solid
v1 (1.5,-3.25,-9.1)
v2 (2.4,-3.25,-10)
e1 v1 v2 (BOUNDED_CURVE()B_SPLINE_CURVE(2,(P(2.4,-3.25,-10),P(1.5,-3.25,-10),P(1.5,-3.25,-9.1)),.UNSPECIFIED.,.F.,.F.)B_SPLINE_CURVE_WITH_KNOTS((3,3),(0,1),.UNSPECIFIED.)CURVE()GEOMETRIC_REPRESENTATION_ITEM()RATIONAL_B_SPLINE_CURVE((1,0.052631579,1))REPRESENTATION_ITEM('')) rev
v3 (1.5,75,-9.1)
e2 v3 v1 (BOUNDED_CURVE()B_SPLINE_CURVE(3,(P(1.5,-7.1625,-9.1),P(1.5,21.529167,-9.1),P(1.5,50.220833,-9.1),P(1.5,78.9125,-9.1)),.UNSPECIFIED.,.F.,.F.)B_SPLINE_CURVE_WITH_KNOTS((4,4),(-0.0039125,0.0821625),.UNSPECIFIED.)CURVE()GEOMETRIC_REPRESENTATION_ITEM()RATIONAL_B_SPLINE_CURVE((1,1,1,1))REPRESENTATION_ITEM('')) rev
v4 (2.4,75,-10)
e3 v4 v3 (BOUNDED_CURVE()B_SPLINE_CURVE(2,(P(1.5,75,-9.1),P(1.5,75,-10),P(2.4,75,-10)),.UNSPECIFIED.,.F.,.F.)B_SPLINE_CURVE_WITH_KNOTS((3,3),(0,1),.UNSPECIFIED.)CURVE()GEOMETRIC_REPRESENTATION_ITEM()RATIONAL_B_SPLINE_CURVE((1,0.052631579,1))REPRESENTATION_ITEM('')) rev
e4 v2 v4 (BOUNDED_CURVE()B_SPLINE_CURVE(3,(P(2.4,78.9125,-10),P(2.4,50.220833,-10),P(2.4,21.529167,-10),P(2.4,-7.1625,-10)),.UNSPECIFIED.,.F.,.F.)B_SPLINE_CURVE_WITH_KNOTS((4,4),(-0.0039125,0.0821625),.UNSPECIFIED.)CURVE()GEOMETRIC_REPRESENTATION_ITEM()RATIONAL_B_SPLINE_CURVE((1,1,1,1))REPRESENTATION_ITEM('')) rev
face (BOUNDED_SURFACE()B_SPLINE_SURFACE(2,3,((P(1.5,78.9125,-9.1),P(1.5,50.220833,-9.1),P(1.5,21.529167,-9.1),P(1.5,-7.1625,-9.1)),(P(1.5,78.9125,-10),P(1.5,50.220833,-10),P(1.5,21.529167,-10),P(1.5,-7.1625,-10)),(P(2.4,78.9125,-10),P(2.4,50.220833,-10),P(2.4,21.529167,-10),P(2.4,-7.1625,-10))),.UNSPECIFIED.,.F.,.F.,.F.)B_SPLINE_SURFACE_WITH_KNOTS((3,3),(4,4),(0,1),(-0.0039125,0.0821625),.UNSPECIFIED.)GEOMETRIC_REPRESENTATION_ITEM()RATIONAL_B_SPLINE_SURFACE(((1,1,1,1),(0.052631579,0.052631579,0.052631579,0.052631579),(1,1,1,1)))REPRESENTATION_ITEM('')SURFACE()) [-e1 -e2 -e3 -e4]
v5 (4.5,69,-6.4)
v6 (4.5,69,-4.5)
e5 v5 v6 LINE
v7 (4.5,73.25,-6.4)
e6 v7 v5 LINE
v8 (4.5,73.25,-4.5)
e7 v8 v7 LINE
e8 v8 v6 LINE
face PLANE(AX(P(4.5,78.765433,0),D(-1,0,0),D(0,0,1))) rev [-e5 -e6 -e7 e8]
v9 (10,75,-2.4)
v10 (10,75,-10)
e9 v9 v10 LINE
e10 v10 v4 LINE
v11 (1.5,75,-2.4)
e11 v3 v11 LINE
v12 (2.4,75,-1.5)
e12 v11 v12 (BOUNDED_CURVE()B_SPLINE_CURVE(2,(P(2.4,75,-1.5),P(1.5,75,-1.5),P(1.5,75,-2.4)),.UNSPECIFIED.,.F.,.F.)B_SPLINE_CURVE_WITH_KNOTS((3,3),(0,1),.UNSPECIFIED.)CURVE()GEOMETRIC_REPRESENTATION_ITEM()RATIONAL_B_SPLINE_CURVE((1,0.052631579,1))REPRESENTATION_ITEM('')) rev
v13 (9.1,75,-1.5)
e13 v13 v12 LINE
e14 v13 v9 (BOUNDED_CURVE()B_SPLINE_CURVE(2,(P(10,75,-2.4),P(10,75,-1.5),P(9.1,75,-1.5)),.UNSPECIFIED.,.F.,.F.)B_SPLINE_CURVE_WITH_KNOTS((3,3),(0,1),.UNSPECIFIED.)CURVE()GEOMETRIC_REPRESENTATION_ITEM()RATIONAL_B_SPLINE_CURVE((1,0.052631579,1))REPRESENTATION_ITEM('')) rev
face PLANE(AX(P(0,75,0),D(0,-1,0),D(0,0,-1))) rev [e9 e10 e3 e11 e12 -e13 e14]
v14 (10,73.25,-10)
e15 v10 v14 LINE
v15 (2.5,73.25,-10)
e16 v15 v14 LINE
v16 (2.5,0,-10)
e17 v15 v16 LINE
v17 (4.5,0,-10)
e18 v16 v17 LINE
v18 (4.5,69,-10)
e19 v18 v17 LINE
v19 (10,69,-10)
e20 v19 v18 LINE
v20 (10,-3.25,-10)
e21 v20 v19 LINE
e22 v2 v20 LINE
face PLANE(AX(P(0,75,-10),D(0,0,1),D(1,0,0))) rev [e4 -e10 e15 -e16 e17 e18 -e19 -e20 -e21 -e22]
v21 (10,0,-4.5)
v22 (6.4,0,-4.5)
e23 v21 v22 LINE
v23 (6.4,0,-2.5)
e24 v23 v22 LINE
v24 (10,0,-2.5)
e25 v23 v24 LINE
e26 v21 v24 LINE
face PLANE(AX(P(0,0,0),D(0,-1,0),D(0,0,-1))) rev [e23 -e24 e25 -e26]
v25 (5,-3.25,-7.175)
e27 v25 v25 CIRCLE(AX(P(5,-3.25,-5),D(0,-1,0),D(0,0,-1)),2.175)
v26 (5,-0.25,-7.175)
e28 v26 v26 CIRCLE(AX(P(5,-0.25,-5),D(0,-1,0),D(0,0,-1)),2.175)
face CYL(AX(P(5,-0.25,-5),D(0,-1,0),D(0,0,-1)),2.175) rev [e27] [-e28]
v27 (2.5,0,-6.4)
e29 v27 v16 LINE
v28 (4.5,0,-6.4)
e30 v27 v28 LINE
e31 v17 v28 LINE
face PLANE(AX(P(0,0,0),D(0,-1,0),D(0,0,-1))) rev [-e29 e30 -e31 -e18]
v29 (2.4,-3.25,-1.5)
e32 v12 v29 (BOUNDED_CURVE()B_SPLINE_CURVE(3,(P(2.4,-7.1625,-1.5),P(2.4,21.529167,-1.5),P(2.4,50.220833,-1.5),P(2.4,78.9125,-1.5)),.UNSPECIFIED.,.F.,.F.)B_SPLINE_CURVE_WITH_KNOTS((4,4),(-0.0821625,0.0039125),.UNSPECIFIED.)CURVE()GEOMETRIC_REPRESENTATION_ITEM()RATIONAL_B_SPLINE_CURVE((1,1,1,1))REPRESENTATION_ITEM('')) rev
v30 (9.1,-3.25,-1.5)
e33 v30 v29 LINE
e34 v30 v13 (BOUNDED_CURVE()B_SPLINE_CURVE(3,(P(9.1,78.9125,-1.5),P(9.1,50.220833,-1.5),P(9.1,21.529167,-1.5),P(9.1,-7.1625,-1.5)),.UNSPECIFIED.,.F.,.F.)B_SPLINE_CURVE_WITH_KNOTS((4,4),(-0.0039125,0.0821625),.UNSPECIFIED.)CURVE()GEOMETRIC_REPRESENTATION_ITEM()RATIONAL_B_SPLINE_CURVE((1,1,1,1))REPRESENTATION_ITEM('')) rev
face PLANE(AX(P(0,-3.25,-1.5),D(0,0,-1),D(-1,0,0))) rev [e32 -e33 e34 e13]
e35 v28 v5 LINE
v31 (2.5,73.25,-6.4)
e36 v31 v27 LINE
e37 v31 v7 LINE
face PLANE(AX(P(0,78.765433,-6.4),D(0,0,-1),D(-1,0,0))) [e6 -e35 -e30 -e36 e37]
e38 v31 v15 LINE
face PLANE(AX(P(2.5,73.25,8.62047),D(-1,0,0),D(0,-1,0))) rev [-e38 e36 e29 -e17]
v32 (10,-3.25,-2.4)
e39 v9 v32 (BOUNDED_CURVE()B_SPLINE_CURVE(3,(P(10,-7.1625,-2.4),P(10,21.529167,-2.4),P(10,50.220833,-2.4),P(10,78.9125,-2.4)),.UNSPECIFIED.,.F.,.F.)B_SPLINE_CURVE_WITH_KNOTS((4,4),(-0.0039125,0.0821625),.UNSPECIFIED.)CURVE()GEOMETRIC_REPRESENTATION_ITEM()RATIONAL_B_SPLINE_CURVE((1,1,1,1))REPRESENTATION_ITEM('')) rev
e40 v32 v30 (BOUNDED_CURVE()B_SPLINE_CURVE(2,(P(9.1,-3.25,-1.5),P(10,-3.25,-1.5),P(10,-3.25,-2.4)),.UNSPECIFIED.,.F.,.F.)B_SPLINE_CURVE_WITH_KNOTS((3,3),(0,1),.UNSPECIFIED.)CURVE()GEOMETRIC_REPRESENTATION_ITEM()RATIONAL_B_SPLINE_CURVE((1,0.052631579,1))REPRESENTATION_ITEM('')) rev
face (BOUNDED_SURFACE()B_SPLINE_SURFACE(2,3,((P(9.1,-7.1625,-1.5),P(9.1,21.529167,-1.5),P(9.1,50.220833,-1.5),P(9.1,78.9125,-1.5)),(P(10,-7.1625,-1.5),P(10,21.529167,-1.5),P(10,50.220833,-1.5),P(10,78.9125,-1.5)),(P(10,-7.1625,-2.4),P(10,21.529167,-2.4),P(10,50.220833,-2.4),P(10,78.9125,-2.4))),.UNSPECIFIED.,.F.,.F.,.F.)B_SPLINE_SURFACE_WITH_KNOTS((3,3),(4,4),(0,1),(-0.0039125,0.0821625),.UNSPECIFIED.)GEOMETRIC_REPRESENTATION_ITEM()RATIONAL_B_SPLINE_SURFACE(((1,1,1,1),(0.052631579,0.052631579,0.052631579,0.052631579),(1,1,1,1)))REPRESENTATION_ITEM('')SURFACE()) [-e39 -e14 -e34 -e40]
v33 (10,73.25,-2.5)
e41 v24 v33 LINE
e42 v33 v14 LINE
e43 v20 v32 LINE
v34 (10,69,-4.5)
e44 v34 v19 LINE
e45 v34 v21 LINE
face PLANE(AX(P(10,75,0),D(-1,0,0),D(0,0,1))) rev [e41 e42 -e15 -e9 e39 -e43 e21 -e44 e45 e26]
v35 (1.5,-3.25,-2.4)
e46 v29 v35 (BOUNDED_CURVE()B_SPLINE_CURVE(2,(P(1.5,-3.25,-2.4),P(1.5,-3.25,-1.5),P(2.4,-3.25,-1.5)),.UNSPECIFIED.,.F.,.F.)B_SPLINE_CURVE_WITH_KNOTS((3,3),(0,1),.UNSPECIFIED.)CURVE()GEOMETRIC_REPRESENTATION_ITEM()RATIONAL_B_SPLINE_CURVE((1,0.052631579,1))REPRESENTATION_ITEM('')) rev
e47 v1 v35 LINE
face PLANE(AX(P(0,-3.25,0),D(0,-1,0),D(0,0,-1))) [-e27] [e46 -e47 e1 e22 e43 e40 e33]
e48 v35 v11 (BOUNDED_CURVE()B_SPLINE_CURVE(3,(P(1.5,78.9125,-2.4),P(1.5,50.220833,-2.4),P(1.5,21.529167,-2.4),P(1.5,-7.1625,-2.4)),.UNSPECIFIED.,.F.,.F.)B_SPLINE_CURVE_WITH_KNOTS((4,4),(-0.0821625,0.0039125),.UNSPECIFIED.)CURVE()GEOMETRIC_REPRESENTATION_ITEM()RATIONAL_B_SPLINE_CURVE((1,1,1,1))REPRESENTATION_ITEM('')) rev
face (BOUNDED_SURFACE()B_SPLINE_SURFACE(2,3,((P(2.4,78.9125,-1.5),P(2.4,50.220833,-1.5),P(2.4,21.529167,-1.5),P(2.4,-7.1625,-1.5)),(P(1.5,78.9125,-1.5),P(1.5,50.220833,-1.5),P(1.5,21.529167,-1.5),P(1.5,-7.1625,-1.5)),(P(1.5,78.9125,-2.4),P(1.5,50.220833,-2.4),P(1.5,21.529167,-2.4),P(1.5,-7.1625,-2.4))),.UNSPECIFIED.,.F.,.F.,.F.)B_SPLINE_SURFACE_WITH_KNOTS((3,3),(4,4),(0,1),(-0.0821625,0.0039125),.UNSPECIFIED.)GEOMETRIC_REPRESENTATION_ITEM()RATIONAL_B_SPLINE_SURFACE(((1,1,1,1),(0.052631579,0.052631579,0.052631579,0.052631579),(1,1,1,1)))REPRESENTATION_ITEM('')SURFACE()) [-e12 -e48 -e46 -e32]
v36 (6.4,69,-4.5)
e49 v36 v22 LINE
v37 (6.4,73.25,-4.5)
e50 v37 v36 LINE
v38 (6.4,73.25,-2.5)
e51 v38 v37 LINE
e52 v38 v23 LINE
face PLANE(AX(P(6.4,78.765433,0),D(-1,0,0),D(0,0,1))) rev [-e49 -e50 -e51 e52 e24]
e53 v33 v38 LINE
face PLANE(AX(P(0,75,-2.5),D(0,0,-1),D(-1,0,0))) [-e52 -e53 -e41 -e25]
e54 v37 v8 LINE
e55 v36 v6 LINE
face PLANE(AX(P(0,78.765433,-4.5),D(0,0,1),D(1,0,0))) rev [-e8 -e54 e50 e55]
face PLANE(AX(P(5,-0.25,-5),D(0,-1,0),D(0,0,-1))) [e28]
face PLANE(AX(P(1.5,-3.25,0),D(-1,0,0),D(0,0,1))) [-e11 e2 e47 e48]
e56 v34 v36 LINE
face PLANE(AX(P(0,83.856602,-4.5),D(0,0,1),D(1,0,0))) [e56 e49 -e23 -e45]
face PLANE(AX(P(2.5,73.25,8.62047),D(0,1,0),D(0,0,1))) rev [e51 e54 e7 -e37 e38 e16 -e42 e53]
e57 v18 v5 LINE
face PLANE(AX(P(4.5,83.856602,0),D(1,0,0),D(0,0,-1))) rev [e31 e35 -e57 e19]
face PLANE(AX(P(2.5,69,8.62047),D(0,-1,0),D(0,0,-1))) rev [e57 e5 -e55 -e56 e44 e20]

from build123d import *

# Parameters (mm, degrees)
SKETCH1_W           = 10
SKETCH1_H           = 10
BOSS_EXTRUDE1_DEPTH = 75
SKETCH3_W           = 7.5
SKETCH3_H           = 4.25
CUT_EXTRUDE1_DEPTH  = 7.5
SKETCH4_W           = 2
SKETCH4_H           = 5.5
CUT_EXTRUDE2_DEPTH  = 73.25
SKETCH5_W           = 10
SKETCH5_H           = 10
BOSS_EXTRUDE2_DEPTH = 3.25
BOSS_EXTRUDE3_REACH = 78.322
SKETCH6_W           = 1
SKETCH6_H           = 1.9
SKETCH6_H_2         = 2
SKETCH7_R           = 2.175
CUT_EXTRUDE3_DEPTH  = 3
SKETCH8_W           = 8.5
SKETCH8_H           = 1.5
CUT_EXTRUDE4_DEPTH  = 80.517686712
FILLET1_SIZE        = 0.9


with BuildPart() as part:
    # Sketch1 → Boss-Extrude1 (new body)
    with BuildSketch(Plane(origin=(0, 0, 0), x_dir=(1, 0, 0), z_dir=(0, 1, 0))):
        with Locations((5, 5)):
            Rectangle(SKETCH1_W, SKETCH1_H)
    extrude(amount=BOSS_EXTRUDE1_DEPTH)

    # Sketch3 → Cut-Extrude1 (cut)
    with BuildSketch(Plane(origin=(0, 0, -10), x_dir=(-1, 0, 0), z_dir=(0, 0, -1))):
        with Locations((-6.25, 71.125)):
            Rectangle(SKETCH3_W, SKETCH3_H)
    extrude(amount=-CUT_EXTRUDE1_DEPTH, mode=Mode.SUBTRACT)

    # Sketch4 → Cut-Extrude2 (cut)
    with BuildSketch(Plane.XZ):
        Polygon((10, -2.5), (2.5, -2.5), (2.5, -4.5), (4.5, -4.5), (10, -4.5), align=None)
        with Locations((3.5, -7.25)):
            Rectangle(SKETCH4_W, SKETCH4_H)
    extrude(amount=-CUT_EXTRUDE2_DEPTH, mode=Mode.SUBTRACT)


with BuildPart() as cut_extrude2_piece_1:
    # of the separate pieces the step leaves, piece 1, a body of its own (cut_extrude2_pieces)
    add(part.part.solids().sort_by_distance((0, 0, 0))[0])



with BuildPart() as cut_extrude2_piece_2:
    # of the separate pieces the step leaves, piece 2, a body of its own (cut_extrude2_pieces)
    add(part.part.solids().sort_by_distance((10, 0, -4.5))[0])


with BuildPart() as cut_extrude2_piece_1_1:
    add(cut_extrude2_piece_1.part)

    add(cut_extrude2_piece_2.part)  # Boss-Extrude2 merges Cut-Extrude2 piece 2
    # Sketch5 → Boss-Extrude2 (add)
    with BuildSketch(Plane.XZ):
        with Locations((5, -5)):
            Rectangle(SKETCH5_W, SKETCH5_H)
    extrude(amount=BOSS_EXTRUDE2_DEPTH)

    # Boss-Extrude3: up to this face of the body (flat: up to its plane)
    boss_extrude3_end = Plane(cut_extrude2_piece_1_1.part.faces().sort_by_distance((6.25, 73.25, -6.25))[0])
    # Sketch6 → Boss-Extrude3 (add, up to the picked face)
    with BuildSketch(Plane(origin=(0, 0, 0), x_dir=(1, 0, 0), z_dir=(0, 1, 0)), mode=Mode.PRIVATE) as boss_extrude3_sk1:
        Polygon((3.5, 4.5), (3.5, 2.5), (6.4, 2.5), (6.4, 4.5), (4.5, 4.5), align=None)
    boss_extrude3_tool1 = split(extrude(boss_extrude3_sk1.sketch, amount=BOSS_EXTRUDE3_REACH, mode=Mode.PRIVATE), bisect_by=boss_extrude3_end, keep=Keep.BOTH, mode=Mode.PRIVATE)
    # Sketch6 → Boss-Extrude3 (add, up to the picked face)
    with BuildSketch(Plane(origin=(0, 0, 0), x_dir=(1, 0, 0), z_dir=(0, 1, 0)), mode=Mode.PRIVATE) as boss_extrude3_sk2:
        with Locations((4, 5.45)):
            Rectangle(SKETCH6_W, SKETCH6_H)
    boss_extrude3_tool2 = split(extrude(boss_extrude3_sk2.sketch, amount=BOSS_EXTRUDE3_REACH, mode=Mode.PRIVATE), bisect_by=boss_extrude3_end, keep=Keep.BOTH, mode=Mode.PRIVATE)
    # Sketch6 → Boss-Extrude3 (add, up to the picked face)
    with BuildSketch(Plane(origin=(0, 0, 0), x_dir=(1, 0, 0), z_dir=(0, 1, 0)), mode=Mode.PRIVATE) as boss_extrude3_sk3:
        with Locations((3, 5.45)):
            Rectangle(SKETCH6_W, SKETCH6_H)
    boss_extrude3_tool3 = split(extrude(boss_extrude3_sk3.sketch, amount=BOSS_EXTRUDE3_REACH, mode=Mode.PRIVATE), bisect_by=boss_extrude3_end, keep=Keep.BOTH, mode=Mode.PRIVATE)
    # Sketch6 → Boss-Extrude3 (add, up to the picked face)
    with BuildSketch(Plane(origin=(0, 0, 0), x_dir=(1, 0, 0), z_dir=(0, 1, 0)), mode=Mode.PRIVATE) as boss_extrude3_sk4:
        with Locations((3, 3.5)):
            Rectangle(SKETCH6_W, SKETCH6_H_2)
    boss_extrude3_tool4 = split(extrude(boss_extrude3_sk4.sketch, amount=BOSS_EXTRUDE3_REACH, mode=Mode.PRIVATE), bisect_by=boss_extrude3_end, keep=Keep.BOTH, mode=Mode.PRIVATE)
    add(boss_extrude3_tool1.solids().sort_by(Axis((4.95, 0, -3.5), (0, 1, 0)))[0])
    add(boss_extrude3_tool2.solids().sort_by(Axis((4, 0, -5.45), (0, 1, 0)))[0])
    add(boss_extrude3_tool3.solids().sort_by(Axis((3, 0, -5.45), (0, 1, 0)))[0])
    add(boss_extrude3_tool4.solids().sort_by(Axis((3, 0, -3.5), (0, 1, 0)))[0])

    # Sketch7 → Cut-Extrude3 (cut)
    with BuildSketch(Plane.XZ.offset(3.25)):
        with Locations(Location((5, -5, 0), (0, 0, 270))):
            Circle(SKETCH7_R)
    extrude(amount=-CUT_EXTRUDE3_DEPTH, mode=Mode.SUBTRACT)

    # Sketch8 → Cut-Extrude4 (cut, through all)
    with BuildSketch(Plane(origin=(0, 75, 0), x_dir=(1, 0, 0), z_dir=(0, 1, 0))):
        Polygon((1.5, 10), (0, 10), (0, 0), (1.5, 0), (1.5, 1.5), align=None)
        with Locations((5.75, 0.75)):
            Rectangle(SKETCH8_W, SKETCH8_H)
    extrude(amount=-CUT_EXTRUDE4_DEPTH, mode=Mode.SUBTRACT)

    # Fillet1
    # a fillet whose section is not a circle: 0.9 mm, written as the material it takes off along each edge
    with BuildSketch(Plane(origin=(10, 77.25, -1.5), x_dir=(0, 0, -1), z_dir=(0, -1, 0)), Plane(origin=(1.5, 77.25, -1.5), x_dir=(1, 0, 0), z_dir=(0, -1, 0))) as fillet1_piece_1:
        with BuildLine():
            Bezier((FILLET1_SIZE, 0), (0, 0), (0, -FILLET1_SIZE), weights=[1, 0.052631579, 1])
            Line((0, -FILLET1_SIZE), (0, 0))
            Line((0, 0), (FILLET1_SIZE, 0))
        make_face()
    extrude(amount=82.75, mode=Mode.SUBTRACT)
    with BuildSketch(Plane(origin=(1.5, 77.25, -10), x_dir=(1, 0, 0), z_dir=(0, -1, 0))) as fillet1_piece_2:
        with BuildLine():
            Bezier((FILLET1_SIZE, 0), (0, 0), (0, FILLET1_SIZE), weights=[1, 0.052631579, 1])
            Line((0, FILLET1_SIZE), (0, 0))
            Line((0, 0), (FILLET1_SIZE, 0))
        make_face()
    extrude(amount=82.75, mode=Mode.SUBTRACT)


solid = cut_extrude2_piece_1_1.part
